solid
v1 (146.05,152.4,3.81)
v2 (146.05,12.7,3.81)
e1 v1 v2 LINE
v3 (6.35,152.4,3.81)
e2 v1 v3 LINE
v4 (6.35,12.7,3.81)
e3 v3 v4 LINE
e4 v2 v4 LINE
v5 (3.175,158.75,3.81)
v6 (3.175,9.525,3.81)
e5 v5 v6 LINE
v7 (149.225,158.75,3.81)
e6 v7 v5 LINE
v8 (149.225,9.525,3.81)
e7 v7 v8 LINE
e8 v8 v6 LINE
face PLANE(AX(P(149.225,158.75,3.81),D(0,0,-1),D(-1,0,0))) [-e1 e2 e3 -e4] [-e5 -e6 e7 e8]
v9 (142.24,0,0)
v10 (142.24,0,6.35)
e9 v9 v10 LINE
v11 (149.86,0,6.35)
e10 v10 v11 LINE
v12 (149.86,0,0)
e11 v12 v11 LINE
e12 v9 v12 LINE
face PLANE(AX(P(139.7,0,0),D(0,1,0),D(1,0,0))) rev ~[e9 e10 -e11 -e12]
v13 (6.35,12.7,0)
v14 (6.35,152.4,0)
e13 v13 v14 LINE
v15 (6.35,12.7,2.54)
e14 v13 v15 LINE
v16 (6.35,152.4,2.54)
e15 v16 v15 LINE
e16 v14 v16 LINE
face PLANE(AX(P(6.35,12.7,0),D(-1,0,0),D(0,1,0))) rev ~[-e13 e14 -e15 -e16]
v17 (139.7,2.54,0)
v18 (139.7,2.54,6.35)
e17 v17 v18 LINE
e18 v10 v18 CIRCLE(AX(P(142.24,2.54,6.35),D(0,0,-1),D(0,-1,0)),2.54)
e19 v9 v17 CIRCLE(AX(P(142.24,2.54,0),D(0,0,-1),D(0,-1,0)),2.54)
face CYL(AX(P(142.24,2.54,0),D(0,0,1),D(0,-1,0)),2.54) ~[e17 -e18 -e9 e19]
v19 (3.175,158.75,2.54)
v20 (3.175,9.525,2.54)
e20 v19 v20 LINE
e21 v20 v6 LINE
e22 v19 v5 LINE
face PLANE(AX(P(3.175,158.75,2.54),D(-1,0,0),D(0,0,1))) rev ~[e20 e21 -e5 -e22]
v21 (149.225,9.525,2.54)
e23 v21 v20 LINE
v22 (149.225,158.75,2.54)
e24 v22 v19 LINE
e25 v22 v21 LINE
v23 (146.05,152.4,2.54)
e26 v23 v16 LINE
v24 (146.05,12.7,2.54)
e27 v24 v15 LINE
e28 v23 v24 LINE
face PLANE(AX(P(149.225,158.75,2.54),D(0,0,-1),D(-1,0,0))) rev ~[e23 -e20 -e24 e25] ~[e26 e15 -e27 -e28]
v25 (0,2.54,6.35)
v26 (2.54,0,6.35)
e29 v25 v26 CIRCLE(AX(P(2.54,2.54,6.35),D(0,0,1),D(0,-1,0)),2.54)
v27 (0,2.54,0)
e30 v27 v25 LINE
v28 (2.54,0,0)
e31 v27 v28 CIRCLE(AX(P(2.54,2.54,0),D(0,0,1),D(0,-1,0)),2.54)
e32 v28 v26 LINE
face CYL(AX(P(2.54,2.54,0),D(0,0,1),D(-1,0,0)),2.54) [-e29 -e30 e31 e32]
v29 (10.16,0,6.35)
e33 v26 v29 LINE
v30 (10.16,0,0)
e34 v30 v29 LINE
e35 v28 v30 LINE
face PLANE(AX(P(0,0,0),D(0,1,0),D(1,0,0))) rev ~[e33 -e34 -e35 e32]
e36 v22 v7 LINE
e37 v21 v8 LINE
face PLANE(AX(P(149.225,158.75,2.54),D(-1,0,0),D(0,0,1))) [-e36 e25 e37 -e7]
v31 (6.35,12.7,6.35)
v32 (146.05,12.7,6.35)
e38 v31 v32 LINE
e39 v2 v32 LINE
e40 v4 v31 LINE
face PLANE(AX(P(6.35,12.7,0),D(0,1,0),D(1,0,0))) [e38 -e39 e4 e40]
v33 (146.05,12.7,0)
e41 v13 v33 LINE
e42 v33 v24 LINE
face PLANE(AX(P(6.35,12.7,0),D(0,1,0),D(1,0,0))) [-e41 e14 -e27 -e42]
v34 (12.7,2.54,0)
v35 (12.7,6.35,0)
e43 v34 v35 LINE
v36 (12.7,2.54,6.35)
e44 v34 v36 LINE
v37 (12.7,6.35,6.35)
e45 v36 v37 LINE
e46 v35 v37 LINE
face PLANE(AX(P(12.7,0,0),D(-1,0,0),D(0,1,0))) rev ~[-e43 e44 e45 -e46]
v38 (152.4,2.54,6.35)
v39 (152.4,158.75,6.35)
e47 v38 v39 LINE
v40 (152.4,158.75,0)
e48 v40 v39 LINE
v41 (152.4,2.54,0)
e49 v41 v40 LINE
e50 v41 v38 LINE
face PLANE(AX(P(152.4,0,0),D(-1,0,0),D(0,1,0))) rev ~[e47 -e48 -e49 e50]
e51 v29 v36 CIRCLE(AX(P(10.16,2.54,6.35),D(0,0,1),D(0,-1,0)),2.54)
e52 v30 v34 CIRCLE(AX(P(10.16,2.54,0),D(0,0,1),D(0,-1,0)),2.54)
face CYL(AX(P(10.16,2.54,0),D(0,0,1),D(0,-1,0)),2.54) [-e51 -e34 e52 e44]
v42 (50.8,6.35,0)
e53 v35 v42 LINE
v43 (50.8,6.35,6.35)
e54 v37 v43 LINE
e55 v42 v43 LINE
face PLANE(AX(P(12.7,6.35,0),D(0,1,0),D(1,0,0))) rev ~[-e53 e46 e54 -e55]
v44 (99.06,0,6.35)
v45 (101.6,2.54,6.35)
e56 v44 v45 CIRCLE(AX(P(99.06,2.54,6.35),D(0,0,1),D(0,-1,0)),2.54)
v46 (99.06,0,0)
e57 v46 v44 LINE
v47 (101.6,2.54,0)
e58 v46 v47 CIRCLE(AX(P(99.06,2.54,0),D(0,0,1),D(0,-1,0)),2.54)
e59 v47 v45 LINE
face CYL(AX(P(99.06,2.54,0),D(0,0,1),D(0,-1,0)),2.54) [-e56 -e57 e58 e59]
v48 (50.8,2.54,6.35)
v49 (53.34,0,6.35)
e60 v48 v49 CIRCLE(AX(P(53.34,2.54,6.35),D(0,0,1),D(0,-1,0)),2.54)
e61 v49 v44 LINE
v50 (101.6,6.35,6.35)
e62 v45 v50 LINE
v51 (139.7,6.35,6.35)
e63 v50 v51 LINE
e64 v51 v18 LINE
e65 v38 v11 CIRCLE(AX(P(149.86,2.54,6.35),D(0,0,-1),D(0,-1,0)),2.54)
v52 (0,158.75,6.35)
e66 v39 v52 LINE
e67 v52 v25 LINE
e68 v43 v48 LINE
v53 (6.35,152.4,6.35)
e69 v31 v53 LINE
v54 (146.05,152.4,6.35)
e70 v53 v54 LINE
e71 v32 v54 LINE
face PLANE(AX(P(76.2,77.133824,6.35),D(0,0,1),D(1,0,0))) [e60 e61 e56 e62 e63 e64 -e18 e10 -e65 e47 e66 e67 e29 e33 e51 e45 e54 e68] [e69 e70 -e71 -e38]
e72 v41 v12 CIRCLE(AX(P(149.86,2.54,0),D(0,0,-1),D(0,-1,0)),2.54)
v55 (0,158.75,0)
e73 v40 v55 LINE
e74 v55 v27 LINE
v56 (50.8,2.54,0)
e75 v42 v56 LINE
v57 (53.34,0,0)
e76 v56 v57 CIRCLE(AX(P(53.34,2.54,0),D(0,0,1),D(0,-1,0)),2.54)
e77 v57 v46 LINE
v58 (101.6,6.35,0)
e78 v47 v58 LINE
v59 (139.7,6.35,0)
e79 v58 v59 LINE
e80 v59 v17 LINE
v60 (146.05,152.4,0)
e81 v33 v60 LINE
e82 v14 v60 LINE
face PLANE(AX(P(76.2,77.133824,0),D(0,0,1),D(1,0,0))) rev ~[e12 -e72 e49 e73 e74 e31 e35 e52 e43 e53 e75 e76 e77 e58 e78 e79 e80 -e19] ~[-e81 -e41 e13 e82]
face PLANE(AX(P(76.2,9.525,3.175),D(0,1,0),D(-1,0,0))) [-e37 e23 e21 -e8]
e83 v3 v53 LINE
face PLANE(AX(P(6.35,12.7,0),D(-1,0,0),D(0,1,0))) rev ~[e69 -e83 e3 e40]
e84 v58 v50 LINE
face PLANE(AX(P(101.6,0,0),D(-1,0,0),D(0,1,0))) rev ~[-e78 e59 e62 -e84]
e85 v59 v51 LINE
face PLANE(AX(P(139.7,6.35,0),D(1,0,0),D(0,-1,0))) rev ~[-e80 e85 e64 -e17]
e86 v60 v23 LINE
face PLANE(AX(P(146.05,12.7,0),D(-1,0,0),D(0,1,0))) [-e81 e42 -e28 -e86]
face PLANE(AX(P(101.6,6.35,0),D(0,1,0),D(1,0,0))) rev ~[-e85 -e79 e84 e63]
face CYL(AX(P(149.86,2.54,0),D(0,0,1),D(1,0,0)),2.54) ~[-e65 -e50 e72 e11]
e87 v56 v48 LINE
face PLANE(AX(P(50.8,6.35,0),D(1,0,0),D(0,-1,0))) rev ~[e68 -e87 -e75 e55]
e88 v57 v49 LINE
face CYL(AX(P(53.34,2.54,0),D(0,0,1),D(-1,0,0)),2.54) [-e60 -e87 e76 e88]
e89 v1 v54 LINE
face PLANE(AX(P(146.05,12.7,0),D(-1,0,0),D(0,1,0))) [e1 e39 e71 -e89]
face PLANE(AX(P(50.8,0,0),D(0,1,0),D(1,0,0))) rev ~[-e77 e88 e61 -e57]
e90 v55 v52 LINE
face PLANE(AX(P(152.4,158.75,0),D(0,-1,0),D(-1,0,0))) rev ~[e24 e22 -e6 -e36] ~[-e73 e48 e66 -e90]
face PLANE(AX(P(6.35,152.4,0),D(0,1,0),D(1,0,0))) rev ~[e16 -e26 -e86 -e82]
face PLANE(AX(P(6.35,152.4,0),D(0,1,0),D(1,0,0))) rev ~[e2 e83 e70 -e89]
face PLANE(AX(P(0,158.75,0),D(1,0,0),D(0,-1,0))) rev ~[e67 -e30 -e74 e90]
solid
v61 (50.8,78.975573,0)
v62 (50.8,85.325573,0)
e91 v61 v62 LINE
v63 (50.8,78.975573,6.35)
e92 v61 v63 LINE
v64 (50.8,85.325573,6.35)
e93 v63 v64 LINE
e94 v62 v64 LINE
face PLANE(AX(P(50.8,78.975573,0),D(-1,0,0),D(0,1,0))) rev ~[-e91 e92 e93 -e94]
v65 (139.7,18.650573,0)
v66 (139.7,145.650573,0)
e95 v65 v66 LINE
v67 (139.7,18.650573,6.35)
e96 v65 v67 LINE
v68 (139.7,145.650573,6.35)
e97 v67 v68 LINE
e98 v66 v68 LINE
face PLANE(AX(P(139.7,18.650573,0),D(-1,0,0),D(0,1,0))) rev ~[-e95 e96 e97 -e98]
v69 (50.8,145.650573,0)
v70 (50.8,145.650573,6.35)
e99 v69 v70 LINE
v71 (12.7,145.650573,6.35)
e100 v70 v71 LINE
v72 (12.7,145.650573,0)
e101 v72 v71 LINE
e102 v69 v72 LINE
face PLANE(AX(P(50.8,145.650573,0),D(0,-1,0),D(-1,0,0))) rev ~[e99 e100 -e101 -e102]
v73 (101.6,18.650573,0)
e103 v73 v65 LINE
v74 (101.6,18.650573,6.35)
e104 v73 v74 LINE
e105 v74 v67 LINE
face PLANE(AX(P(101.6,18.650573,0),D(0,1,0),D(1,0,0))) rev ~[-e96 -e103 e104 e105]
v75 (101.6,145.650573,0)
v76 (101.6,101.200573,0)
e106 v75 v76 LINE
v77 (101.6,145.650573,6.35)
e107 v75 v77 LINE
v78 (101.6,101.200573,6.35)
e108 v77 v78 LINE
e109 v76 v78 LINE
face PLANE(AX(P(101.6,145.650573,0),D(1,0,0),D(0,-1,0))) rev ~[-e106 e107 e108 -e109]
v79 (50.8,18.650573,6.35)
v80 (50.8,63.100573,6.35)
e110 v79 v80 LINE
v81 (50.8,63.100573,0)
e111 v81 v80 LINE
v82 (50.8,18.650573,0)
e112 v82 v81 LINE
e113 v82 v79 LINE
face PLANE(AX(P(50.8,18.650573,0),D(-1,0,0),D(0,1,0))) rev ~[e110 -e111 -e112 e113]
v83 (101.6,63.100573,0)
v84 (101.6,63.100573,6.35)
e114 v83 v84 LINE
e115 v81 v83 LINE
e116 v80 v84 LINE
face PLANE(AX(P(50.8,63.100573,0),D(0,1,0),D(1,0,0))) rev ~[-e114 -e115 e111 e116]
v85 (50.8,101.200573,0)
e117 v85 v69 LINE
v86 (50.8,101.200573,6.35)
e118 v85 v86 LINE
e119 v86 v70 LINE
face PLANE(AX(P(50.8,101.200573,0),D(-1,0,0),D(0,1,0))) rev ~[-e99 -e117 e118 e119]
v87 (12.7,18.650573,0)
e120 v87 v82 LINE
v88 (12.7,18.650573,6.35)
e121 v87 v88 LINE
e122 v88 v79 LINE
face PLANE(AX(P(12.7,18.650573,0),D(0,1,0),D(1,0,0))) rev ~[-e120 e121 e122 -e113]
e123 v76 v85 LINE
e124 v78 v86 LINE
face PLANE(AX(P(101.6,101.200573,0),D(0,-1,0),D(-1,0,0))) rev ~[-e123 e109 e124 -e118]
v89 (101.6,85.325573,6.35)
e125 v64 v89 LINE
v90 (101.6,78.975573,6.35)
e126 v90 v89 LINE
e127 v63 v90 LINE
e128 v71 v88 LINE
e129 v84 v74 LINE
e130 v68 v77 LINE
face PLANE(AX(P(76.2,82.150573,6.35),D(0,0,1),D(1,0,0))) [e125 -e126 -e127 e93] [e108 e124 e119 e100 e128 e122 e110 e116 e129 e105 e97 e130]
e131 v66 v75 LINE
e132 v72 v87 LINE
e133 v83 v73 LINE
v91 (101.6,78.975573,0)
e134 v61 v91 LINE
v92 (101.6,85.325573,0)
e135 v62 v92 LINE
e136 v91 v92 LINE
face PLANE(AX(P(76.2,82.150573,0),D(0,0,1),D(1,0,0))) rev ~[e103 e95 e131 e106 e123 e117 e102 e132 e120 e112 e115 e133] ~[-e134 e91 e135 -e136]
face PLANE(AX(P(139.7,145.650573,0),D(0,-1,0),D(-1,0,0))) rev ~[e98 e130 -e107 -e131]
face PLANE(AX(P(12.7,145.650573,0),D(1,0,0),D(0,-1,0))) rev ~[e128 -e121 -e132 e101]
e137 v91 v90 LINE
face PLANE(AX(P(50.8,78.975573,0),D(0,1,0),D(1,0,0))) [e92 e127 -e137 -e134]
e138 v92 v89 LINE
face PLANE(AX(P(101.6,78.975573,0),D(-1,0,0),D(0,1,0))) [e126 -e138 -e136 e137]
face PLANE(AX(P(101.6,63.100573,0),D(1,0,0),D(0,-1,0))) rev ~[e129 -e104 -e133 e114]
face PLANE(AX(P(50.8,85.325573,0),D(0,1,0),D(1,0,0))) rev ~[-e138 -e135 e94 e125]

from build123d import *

# Parameters (mm, degrees)
F0_W     = 139.7
F0_H     = 139.7
F1_DEPTH = 6.35
F0_W_2   = 50.8
F0_H_2   = 6.35
F2_W     = 146.05
F2_H     = 1.27
F3_DEPTH = 149.225
F4_R     = 2.54


with BuildPart() as f1:
    # F0 (on Top) → F1 (new body)
    with BuildSketch(Plane.XY):
        Polygon((0, 158.75), (0, 0), (12.7, 0), (12.7, 6.35), (50.8, 6.35), (50.8, 0), (101.6, 0), (101.6, 6.35), (139.7, 6.35), (139.7, 0), (152.4, 0), (152.4, 158.75), align=None)
        with Locations((76.2, 82.55)):
            Rectangle(F0_W, F0_H, mode=Mode.SUBTRACT)
    extrude(amount=F1_DEPTH)

    # F2 (on face) → F3 (cut)
    with BuildSketch(Plane(origin=(0, 158.75, 0), x_dir=(-1, 0, 0), z_dir=(0, 1, 0))):
        with Locations((-76.2, 3.175)):
            Rectangle(F2_W, F2_H)
    extrude(amount=-F3_DEPTH, mode=Mode.SUBTRACT)

    # F4
    f4_edges = [f1.edges().sort_by_distance(p)[0] for p in [
        (12.7, 0, 3.175),
        (0, 0, 3.175),
        (50.8, 0, 3.175),
        (101.6, 0, 3.175),
        (139.7, 0, 3.175),
        (152.4, 0, 3.175),
    ]]
    fillet(f4_edges, radius=F4_R)


with BuildPart() as f1b:
    # F0 (on Top) → F1, piece 2 (new body)
    with BuildSketch(Plane.XY):
        Polygon((50.8, 145.6505734556), (12.7, 145.6505734556), (12.7, 18.6505734556), (50.8, 18.6505734556), (50.8, 63.1005734556), (101.6, 63.1005734556), (101.6, 18.6505734556), (139.7, 18.6505734556), (139.7, 145.6505734556), (101.6, 145.6505734556), (101.6, 101.2005734556), (50.8, 101.2005734556), align=None)
        with Locations((76.2, 82.1505734556)):
            Rectangle(F0_W_2, F0_H_2, mode=Mode.SUBTRACT)
    extrude(amount=F1_DEPTH)


solid = Compound([f1.part, f1b.part])
